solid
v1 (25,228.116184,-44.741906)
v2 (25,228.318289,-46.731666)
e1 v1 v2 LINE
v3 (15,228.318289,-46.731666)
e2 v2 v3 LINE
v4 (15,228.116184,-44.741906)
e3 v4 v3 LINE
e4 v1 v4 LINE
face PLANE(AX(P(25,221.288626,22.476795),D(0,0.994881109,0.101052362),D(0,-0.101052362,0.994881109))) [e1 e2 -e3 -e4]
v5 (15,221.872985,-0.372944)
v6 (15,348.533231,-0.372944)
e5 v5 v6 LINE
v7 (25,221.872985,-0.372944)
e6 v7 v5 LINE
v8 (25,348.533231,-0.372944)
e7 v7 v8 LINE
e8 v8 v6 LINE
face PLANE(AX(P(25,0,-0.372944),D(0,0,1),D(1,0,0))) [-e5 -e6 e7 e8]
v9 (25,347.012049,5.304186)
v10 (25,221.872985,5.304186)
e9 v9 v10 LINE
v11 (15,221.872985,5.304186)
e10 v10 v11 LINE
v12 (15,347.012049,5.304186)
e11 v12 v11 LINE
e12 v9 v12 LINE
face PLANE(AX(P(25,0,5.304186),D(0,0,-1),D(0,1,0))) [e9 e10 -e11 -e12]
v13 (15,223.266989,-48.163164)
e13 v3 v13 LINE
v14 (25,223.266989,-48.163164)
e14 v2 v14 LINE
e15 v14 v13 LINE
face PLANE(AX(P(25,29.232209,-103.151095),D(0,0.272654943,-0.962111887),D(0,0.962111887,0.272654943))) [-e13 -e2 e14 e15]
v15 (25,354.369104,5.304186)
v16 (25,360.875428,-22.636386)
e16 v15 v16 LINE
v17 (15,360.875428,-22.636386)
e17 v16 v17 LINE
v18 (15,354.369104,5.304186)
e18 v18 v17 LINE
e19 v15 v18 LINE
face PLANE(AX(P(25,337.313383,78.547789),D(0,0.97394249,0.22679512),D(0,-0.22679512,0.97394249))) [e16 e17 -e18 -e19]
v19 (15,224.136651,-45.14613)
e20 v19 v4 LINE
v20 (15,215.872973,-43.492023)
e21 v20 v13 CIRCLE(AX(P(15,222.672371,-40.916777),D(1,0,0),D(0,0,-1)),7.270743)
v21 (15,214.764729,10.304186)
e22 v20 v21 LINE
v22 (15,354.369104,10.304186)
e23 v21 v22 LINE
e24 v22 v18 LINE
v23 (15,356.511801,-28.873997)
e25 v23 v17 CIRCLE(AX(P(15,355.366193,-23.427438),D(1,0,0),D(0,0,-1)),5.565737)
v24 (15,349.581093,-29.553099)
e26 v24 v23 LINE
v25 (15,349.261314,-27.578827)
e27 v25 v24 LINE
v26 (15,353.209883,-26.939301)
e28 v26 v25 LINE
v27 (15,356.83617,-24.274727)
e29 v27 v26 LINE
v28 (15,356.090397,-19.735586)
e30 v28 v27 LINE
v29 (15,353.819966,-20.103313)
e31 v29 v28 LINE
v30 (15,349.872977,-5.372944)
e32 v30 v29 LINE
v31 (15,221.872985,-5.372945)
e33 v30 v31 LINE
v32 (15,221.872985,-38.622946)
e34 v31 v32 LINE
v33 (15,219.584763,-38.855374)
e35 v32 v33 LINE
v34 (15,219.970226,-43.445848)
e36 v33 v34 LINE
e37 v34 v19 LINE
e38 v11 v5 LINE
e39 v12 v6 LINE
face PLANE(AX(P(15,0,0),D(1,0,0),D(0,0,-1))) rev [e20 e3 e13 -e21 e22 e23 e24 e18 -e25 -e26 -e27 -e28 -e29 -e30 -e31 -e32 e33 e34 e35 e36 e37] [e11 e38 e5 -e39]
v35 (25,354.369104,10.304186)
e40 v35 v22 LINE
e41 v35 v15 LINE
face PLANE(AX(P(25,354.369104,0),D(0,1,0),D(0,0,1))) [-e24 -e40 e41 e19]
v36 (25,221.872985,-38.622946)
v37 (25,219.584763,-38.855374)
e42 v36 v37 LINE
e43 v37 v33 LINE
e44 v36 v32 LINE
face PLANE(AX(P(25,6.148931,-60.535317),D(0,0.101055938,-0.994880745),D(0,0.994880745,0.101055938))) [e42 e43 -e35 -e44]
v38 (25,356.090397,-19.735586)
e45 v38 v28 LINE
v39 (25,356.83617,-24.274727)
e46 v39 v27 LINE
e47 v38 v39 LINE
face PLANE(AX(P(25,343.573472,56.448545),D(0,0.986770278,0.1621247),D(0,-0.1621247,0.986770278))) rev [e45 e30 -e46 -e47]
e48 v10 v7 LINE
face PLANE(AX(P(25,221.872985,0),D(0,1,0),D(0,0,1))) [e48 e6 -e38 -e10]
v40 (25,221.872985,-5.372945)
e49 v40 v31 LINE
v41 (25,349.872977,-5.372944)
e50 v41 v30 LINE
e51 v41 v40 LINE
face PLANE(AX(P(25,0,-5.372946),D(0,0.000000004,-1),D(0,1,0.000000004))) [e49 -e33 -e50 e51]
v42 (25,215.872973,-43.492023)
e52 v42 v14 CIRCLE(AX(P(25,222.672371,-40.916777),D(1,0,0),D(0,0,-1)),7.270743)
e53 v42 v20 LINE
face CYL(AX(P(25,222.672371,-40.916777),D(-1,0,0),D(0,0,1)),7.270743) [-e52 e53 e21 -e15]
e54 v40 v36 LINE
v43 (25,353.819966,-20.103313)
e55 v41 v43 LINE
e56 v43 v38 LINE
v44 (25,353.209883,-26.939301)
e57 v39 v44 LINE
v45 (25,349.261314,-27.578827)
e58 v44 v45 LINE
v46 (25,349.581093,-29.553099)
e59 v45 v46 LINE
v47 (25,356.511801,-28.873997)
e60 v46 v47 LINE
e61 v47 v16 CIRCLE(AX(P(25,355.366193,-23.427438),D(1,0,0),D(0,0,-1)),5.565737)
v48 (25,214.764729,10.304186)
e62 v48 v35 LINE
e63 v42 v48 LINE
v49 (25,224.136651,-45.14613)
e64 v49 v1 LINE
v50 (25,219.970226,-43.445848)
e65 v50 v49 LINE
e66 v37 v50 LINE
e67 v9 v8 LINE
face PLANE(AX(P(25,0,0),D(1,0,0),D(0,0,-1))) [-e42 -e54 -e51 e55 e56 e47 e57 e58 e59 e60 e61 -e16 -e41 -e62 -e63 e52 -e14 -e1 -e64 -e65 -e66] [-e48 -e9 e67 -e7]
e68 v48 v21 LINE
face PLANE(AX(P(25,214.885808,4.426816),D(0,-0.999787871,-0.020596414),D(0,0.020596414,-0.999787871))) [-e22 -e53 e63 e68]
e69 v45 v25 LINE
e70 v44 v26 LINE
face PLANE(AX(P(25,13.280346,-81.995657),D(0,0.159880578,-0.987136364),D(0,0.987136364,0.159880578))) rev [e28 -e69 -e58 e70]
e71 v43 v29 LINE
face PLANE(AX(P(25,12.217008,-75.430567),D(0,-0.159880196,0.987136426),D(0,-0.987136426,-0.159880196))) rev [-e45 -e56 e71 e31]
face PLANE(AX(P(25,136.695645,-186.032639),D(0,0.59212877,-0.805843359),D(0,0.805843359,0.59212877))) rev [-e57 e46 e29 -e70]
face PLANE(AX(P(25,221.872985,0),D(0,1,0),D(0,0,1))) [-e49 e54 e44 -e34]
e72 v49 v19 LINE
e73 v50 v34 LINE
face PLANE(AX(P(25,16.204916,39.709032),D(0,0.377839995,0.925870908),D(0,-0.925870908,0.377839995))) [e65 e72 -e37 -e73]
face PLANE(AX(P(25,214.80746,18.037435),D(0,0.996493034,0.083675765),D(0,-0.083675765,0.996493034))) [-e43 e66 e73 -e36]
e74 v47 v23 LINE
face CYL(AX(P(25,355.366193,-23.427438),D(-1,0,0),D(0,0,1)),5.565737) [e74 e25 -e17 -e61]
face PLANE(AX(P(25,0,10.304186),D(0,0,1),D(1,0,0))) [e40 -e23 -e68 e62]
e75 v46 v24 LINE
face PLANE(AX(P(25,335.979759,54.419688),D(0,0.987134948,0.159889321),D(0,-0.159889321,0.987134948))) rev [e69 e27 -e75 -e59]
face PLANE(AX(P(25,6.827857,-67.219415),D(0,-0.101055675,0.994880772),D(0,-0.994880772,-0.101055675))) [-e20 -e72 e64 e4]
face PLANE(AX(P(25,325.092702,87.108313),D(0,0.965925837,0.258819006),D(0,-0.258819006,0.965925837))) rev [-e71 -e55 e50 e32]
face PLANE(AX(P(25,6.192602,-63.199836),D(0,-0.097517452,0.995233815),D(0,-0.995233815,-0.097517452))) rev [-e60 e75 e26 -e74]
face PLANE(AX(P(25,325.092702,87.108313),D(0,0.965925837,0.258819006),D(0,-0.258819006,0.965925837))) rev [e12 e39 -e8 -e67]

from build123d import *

# Parameters (mm, degrees)
BOSS_EXTRUDE1_DEPTH = 10


# Read off the part's stored shape, not the designer's step: Imported1
with BuildPart() as part:
    # Sketch3 → Boss-Extrude1 (new body)
    with BuildSketch(Plane(origin=(14.999999665, 0, 0), x_dir=(0, 0, -1), z_dir=(1, 0, 0))):
        with BuildLine():
            Line((29.553098604, 349.581092596), (28.873996809, 356.511801481))
            ThreePointArc((28.873996809, 356.511801481), (26.617852211, 359.926750423), (22.636385635, 360.875427723))
            Line((22.636385635, 360.875427723), (-5.304185674, 354.369103909))
            Line((-5.304185674, 354.369103909), (-10.304185562, 354.369103909))
            Line((-10.304185562, 354.369103909), (-10.304185562, 214.764729142))
            Line((-10.304185562, 214.764729142), (43.492022902, 215.872973204))
            ThreePointArc((43.492022902, 215.872973204), (47.063645136, 218.78911025), (48.163164407, 223.266988993))
            Line((48.163164407, 223.266988993), (46.73166573, 228.318288922))
            Line((46.73166573, 228.318288922), (44.741906226, 228.116184473))
            Line((44.741906226, 228.116184473), (45.146130025, 224.136650562))
            Line((45.146130025, 224.136650562), (43.445847929, 219.970226288))
            Line((43.445847929, 219.970226288), (38.855373859, 219.58476305))
            Line((38.855373859, 219.58476305), (38.622945547, 221.872985363))
            Line((38.622945547, 221.872985363), (5.372944754, 221.872985363))
            Line((5.372944754, 221.872985363), (5.372944288, 349.872976542))
            Line((5.372944288, 349.872976542), (20.103313029, 353.819966316))
            Line((20.103313029, 353.819966316), (19.735585898, 356.090396643))
            Line((19.735585898, 356.090396643), (24.27472733, 356.836169958))
            Line((24.27472733, 356.836169958), (26.93930082, 353.209882975))
            Line((26.93930082, 353.209882975), (27.578826994, 349.261313677))
            Line((27.578826994, 349.261313677), (29.553098604, 349.581092596))
        make_face()
        Polygon((-5.304185562, 221.872985363), (0.372943822, 221.872985363), (0.372943822, 348.53323067), (-5.304185562, 347.01204868), align=None, mode=Mode.SUBTRACT)
    extrude(amount=BOSS_EXTRUDE1_DEPTH)


solid = part.part
